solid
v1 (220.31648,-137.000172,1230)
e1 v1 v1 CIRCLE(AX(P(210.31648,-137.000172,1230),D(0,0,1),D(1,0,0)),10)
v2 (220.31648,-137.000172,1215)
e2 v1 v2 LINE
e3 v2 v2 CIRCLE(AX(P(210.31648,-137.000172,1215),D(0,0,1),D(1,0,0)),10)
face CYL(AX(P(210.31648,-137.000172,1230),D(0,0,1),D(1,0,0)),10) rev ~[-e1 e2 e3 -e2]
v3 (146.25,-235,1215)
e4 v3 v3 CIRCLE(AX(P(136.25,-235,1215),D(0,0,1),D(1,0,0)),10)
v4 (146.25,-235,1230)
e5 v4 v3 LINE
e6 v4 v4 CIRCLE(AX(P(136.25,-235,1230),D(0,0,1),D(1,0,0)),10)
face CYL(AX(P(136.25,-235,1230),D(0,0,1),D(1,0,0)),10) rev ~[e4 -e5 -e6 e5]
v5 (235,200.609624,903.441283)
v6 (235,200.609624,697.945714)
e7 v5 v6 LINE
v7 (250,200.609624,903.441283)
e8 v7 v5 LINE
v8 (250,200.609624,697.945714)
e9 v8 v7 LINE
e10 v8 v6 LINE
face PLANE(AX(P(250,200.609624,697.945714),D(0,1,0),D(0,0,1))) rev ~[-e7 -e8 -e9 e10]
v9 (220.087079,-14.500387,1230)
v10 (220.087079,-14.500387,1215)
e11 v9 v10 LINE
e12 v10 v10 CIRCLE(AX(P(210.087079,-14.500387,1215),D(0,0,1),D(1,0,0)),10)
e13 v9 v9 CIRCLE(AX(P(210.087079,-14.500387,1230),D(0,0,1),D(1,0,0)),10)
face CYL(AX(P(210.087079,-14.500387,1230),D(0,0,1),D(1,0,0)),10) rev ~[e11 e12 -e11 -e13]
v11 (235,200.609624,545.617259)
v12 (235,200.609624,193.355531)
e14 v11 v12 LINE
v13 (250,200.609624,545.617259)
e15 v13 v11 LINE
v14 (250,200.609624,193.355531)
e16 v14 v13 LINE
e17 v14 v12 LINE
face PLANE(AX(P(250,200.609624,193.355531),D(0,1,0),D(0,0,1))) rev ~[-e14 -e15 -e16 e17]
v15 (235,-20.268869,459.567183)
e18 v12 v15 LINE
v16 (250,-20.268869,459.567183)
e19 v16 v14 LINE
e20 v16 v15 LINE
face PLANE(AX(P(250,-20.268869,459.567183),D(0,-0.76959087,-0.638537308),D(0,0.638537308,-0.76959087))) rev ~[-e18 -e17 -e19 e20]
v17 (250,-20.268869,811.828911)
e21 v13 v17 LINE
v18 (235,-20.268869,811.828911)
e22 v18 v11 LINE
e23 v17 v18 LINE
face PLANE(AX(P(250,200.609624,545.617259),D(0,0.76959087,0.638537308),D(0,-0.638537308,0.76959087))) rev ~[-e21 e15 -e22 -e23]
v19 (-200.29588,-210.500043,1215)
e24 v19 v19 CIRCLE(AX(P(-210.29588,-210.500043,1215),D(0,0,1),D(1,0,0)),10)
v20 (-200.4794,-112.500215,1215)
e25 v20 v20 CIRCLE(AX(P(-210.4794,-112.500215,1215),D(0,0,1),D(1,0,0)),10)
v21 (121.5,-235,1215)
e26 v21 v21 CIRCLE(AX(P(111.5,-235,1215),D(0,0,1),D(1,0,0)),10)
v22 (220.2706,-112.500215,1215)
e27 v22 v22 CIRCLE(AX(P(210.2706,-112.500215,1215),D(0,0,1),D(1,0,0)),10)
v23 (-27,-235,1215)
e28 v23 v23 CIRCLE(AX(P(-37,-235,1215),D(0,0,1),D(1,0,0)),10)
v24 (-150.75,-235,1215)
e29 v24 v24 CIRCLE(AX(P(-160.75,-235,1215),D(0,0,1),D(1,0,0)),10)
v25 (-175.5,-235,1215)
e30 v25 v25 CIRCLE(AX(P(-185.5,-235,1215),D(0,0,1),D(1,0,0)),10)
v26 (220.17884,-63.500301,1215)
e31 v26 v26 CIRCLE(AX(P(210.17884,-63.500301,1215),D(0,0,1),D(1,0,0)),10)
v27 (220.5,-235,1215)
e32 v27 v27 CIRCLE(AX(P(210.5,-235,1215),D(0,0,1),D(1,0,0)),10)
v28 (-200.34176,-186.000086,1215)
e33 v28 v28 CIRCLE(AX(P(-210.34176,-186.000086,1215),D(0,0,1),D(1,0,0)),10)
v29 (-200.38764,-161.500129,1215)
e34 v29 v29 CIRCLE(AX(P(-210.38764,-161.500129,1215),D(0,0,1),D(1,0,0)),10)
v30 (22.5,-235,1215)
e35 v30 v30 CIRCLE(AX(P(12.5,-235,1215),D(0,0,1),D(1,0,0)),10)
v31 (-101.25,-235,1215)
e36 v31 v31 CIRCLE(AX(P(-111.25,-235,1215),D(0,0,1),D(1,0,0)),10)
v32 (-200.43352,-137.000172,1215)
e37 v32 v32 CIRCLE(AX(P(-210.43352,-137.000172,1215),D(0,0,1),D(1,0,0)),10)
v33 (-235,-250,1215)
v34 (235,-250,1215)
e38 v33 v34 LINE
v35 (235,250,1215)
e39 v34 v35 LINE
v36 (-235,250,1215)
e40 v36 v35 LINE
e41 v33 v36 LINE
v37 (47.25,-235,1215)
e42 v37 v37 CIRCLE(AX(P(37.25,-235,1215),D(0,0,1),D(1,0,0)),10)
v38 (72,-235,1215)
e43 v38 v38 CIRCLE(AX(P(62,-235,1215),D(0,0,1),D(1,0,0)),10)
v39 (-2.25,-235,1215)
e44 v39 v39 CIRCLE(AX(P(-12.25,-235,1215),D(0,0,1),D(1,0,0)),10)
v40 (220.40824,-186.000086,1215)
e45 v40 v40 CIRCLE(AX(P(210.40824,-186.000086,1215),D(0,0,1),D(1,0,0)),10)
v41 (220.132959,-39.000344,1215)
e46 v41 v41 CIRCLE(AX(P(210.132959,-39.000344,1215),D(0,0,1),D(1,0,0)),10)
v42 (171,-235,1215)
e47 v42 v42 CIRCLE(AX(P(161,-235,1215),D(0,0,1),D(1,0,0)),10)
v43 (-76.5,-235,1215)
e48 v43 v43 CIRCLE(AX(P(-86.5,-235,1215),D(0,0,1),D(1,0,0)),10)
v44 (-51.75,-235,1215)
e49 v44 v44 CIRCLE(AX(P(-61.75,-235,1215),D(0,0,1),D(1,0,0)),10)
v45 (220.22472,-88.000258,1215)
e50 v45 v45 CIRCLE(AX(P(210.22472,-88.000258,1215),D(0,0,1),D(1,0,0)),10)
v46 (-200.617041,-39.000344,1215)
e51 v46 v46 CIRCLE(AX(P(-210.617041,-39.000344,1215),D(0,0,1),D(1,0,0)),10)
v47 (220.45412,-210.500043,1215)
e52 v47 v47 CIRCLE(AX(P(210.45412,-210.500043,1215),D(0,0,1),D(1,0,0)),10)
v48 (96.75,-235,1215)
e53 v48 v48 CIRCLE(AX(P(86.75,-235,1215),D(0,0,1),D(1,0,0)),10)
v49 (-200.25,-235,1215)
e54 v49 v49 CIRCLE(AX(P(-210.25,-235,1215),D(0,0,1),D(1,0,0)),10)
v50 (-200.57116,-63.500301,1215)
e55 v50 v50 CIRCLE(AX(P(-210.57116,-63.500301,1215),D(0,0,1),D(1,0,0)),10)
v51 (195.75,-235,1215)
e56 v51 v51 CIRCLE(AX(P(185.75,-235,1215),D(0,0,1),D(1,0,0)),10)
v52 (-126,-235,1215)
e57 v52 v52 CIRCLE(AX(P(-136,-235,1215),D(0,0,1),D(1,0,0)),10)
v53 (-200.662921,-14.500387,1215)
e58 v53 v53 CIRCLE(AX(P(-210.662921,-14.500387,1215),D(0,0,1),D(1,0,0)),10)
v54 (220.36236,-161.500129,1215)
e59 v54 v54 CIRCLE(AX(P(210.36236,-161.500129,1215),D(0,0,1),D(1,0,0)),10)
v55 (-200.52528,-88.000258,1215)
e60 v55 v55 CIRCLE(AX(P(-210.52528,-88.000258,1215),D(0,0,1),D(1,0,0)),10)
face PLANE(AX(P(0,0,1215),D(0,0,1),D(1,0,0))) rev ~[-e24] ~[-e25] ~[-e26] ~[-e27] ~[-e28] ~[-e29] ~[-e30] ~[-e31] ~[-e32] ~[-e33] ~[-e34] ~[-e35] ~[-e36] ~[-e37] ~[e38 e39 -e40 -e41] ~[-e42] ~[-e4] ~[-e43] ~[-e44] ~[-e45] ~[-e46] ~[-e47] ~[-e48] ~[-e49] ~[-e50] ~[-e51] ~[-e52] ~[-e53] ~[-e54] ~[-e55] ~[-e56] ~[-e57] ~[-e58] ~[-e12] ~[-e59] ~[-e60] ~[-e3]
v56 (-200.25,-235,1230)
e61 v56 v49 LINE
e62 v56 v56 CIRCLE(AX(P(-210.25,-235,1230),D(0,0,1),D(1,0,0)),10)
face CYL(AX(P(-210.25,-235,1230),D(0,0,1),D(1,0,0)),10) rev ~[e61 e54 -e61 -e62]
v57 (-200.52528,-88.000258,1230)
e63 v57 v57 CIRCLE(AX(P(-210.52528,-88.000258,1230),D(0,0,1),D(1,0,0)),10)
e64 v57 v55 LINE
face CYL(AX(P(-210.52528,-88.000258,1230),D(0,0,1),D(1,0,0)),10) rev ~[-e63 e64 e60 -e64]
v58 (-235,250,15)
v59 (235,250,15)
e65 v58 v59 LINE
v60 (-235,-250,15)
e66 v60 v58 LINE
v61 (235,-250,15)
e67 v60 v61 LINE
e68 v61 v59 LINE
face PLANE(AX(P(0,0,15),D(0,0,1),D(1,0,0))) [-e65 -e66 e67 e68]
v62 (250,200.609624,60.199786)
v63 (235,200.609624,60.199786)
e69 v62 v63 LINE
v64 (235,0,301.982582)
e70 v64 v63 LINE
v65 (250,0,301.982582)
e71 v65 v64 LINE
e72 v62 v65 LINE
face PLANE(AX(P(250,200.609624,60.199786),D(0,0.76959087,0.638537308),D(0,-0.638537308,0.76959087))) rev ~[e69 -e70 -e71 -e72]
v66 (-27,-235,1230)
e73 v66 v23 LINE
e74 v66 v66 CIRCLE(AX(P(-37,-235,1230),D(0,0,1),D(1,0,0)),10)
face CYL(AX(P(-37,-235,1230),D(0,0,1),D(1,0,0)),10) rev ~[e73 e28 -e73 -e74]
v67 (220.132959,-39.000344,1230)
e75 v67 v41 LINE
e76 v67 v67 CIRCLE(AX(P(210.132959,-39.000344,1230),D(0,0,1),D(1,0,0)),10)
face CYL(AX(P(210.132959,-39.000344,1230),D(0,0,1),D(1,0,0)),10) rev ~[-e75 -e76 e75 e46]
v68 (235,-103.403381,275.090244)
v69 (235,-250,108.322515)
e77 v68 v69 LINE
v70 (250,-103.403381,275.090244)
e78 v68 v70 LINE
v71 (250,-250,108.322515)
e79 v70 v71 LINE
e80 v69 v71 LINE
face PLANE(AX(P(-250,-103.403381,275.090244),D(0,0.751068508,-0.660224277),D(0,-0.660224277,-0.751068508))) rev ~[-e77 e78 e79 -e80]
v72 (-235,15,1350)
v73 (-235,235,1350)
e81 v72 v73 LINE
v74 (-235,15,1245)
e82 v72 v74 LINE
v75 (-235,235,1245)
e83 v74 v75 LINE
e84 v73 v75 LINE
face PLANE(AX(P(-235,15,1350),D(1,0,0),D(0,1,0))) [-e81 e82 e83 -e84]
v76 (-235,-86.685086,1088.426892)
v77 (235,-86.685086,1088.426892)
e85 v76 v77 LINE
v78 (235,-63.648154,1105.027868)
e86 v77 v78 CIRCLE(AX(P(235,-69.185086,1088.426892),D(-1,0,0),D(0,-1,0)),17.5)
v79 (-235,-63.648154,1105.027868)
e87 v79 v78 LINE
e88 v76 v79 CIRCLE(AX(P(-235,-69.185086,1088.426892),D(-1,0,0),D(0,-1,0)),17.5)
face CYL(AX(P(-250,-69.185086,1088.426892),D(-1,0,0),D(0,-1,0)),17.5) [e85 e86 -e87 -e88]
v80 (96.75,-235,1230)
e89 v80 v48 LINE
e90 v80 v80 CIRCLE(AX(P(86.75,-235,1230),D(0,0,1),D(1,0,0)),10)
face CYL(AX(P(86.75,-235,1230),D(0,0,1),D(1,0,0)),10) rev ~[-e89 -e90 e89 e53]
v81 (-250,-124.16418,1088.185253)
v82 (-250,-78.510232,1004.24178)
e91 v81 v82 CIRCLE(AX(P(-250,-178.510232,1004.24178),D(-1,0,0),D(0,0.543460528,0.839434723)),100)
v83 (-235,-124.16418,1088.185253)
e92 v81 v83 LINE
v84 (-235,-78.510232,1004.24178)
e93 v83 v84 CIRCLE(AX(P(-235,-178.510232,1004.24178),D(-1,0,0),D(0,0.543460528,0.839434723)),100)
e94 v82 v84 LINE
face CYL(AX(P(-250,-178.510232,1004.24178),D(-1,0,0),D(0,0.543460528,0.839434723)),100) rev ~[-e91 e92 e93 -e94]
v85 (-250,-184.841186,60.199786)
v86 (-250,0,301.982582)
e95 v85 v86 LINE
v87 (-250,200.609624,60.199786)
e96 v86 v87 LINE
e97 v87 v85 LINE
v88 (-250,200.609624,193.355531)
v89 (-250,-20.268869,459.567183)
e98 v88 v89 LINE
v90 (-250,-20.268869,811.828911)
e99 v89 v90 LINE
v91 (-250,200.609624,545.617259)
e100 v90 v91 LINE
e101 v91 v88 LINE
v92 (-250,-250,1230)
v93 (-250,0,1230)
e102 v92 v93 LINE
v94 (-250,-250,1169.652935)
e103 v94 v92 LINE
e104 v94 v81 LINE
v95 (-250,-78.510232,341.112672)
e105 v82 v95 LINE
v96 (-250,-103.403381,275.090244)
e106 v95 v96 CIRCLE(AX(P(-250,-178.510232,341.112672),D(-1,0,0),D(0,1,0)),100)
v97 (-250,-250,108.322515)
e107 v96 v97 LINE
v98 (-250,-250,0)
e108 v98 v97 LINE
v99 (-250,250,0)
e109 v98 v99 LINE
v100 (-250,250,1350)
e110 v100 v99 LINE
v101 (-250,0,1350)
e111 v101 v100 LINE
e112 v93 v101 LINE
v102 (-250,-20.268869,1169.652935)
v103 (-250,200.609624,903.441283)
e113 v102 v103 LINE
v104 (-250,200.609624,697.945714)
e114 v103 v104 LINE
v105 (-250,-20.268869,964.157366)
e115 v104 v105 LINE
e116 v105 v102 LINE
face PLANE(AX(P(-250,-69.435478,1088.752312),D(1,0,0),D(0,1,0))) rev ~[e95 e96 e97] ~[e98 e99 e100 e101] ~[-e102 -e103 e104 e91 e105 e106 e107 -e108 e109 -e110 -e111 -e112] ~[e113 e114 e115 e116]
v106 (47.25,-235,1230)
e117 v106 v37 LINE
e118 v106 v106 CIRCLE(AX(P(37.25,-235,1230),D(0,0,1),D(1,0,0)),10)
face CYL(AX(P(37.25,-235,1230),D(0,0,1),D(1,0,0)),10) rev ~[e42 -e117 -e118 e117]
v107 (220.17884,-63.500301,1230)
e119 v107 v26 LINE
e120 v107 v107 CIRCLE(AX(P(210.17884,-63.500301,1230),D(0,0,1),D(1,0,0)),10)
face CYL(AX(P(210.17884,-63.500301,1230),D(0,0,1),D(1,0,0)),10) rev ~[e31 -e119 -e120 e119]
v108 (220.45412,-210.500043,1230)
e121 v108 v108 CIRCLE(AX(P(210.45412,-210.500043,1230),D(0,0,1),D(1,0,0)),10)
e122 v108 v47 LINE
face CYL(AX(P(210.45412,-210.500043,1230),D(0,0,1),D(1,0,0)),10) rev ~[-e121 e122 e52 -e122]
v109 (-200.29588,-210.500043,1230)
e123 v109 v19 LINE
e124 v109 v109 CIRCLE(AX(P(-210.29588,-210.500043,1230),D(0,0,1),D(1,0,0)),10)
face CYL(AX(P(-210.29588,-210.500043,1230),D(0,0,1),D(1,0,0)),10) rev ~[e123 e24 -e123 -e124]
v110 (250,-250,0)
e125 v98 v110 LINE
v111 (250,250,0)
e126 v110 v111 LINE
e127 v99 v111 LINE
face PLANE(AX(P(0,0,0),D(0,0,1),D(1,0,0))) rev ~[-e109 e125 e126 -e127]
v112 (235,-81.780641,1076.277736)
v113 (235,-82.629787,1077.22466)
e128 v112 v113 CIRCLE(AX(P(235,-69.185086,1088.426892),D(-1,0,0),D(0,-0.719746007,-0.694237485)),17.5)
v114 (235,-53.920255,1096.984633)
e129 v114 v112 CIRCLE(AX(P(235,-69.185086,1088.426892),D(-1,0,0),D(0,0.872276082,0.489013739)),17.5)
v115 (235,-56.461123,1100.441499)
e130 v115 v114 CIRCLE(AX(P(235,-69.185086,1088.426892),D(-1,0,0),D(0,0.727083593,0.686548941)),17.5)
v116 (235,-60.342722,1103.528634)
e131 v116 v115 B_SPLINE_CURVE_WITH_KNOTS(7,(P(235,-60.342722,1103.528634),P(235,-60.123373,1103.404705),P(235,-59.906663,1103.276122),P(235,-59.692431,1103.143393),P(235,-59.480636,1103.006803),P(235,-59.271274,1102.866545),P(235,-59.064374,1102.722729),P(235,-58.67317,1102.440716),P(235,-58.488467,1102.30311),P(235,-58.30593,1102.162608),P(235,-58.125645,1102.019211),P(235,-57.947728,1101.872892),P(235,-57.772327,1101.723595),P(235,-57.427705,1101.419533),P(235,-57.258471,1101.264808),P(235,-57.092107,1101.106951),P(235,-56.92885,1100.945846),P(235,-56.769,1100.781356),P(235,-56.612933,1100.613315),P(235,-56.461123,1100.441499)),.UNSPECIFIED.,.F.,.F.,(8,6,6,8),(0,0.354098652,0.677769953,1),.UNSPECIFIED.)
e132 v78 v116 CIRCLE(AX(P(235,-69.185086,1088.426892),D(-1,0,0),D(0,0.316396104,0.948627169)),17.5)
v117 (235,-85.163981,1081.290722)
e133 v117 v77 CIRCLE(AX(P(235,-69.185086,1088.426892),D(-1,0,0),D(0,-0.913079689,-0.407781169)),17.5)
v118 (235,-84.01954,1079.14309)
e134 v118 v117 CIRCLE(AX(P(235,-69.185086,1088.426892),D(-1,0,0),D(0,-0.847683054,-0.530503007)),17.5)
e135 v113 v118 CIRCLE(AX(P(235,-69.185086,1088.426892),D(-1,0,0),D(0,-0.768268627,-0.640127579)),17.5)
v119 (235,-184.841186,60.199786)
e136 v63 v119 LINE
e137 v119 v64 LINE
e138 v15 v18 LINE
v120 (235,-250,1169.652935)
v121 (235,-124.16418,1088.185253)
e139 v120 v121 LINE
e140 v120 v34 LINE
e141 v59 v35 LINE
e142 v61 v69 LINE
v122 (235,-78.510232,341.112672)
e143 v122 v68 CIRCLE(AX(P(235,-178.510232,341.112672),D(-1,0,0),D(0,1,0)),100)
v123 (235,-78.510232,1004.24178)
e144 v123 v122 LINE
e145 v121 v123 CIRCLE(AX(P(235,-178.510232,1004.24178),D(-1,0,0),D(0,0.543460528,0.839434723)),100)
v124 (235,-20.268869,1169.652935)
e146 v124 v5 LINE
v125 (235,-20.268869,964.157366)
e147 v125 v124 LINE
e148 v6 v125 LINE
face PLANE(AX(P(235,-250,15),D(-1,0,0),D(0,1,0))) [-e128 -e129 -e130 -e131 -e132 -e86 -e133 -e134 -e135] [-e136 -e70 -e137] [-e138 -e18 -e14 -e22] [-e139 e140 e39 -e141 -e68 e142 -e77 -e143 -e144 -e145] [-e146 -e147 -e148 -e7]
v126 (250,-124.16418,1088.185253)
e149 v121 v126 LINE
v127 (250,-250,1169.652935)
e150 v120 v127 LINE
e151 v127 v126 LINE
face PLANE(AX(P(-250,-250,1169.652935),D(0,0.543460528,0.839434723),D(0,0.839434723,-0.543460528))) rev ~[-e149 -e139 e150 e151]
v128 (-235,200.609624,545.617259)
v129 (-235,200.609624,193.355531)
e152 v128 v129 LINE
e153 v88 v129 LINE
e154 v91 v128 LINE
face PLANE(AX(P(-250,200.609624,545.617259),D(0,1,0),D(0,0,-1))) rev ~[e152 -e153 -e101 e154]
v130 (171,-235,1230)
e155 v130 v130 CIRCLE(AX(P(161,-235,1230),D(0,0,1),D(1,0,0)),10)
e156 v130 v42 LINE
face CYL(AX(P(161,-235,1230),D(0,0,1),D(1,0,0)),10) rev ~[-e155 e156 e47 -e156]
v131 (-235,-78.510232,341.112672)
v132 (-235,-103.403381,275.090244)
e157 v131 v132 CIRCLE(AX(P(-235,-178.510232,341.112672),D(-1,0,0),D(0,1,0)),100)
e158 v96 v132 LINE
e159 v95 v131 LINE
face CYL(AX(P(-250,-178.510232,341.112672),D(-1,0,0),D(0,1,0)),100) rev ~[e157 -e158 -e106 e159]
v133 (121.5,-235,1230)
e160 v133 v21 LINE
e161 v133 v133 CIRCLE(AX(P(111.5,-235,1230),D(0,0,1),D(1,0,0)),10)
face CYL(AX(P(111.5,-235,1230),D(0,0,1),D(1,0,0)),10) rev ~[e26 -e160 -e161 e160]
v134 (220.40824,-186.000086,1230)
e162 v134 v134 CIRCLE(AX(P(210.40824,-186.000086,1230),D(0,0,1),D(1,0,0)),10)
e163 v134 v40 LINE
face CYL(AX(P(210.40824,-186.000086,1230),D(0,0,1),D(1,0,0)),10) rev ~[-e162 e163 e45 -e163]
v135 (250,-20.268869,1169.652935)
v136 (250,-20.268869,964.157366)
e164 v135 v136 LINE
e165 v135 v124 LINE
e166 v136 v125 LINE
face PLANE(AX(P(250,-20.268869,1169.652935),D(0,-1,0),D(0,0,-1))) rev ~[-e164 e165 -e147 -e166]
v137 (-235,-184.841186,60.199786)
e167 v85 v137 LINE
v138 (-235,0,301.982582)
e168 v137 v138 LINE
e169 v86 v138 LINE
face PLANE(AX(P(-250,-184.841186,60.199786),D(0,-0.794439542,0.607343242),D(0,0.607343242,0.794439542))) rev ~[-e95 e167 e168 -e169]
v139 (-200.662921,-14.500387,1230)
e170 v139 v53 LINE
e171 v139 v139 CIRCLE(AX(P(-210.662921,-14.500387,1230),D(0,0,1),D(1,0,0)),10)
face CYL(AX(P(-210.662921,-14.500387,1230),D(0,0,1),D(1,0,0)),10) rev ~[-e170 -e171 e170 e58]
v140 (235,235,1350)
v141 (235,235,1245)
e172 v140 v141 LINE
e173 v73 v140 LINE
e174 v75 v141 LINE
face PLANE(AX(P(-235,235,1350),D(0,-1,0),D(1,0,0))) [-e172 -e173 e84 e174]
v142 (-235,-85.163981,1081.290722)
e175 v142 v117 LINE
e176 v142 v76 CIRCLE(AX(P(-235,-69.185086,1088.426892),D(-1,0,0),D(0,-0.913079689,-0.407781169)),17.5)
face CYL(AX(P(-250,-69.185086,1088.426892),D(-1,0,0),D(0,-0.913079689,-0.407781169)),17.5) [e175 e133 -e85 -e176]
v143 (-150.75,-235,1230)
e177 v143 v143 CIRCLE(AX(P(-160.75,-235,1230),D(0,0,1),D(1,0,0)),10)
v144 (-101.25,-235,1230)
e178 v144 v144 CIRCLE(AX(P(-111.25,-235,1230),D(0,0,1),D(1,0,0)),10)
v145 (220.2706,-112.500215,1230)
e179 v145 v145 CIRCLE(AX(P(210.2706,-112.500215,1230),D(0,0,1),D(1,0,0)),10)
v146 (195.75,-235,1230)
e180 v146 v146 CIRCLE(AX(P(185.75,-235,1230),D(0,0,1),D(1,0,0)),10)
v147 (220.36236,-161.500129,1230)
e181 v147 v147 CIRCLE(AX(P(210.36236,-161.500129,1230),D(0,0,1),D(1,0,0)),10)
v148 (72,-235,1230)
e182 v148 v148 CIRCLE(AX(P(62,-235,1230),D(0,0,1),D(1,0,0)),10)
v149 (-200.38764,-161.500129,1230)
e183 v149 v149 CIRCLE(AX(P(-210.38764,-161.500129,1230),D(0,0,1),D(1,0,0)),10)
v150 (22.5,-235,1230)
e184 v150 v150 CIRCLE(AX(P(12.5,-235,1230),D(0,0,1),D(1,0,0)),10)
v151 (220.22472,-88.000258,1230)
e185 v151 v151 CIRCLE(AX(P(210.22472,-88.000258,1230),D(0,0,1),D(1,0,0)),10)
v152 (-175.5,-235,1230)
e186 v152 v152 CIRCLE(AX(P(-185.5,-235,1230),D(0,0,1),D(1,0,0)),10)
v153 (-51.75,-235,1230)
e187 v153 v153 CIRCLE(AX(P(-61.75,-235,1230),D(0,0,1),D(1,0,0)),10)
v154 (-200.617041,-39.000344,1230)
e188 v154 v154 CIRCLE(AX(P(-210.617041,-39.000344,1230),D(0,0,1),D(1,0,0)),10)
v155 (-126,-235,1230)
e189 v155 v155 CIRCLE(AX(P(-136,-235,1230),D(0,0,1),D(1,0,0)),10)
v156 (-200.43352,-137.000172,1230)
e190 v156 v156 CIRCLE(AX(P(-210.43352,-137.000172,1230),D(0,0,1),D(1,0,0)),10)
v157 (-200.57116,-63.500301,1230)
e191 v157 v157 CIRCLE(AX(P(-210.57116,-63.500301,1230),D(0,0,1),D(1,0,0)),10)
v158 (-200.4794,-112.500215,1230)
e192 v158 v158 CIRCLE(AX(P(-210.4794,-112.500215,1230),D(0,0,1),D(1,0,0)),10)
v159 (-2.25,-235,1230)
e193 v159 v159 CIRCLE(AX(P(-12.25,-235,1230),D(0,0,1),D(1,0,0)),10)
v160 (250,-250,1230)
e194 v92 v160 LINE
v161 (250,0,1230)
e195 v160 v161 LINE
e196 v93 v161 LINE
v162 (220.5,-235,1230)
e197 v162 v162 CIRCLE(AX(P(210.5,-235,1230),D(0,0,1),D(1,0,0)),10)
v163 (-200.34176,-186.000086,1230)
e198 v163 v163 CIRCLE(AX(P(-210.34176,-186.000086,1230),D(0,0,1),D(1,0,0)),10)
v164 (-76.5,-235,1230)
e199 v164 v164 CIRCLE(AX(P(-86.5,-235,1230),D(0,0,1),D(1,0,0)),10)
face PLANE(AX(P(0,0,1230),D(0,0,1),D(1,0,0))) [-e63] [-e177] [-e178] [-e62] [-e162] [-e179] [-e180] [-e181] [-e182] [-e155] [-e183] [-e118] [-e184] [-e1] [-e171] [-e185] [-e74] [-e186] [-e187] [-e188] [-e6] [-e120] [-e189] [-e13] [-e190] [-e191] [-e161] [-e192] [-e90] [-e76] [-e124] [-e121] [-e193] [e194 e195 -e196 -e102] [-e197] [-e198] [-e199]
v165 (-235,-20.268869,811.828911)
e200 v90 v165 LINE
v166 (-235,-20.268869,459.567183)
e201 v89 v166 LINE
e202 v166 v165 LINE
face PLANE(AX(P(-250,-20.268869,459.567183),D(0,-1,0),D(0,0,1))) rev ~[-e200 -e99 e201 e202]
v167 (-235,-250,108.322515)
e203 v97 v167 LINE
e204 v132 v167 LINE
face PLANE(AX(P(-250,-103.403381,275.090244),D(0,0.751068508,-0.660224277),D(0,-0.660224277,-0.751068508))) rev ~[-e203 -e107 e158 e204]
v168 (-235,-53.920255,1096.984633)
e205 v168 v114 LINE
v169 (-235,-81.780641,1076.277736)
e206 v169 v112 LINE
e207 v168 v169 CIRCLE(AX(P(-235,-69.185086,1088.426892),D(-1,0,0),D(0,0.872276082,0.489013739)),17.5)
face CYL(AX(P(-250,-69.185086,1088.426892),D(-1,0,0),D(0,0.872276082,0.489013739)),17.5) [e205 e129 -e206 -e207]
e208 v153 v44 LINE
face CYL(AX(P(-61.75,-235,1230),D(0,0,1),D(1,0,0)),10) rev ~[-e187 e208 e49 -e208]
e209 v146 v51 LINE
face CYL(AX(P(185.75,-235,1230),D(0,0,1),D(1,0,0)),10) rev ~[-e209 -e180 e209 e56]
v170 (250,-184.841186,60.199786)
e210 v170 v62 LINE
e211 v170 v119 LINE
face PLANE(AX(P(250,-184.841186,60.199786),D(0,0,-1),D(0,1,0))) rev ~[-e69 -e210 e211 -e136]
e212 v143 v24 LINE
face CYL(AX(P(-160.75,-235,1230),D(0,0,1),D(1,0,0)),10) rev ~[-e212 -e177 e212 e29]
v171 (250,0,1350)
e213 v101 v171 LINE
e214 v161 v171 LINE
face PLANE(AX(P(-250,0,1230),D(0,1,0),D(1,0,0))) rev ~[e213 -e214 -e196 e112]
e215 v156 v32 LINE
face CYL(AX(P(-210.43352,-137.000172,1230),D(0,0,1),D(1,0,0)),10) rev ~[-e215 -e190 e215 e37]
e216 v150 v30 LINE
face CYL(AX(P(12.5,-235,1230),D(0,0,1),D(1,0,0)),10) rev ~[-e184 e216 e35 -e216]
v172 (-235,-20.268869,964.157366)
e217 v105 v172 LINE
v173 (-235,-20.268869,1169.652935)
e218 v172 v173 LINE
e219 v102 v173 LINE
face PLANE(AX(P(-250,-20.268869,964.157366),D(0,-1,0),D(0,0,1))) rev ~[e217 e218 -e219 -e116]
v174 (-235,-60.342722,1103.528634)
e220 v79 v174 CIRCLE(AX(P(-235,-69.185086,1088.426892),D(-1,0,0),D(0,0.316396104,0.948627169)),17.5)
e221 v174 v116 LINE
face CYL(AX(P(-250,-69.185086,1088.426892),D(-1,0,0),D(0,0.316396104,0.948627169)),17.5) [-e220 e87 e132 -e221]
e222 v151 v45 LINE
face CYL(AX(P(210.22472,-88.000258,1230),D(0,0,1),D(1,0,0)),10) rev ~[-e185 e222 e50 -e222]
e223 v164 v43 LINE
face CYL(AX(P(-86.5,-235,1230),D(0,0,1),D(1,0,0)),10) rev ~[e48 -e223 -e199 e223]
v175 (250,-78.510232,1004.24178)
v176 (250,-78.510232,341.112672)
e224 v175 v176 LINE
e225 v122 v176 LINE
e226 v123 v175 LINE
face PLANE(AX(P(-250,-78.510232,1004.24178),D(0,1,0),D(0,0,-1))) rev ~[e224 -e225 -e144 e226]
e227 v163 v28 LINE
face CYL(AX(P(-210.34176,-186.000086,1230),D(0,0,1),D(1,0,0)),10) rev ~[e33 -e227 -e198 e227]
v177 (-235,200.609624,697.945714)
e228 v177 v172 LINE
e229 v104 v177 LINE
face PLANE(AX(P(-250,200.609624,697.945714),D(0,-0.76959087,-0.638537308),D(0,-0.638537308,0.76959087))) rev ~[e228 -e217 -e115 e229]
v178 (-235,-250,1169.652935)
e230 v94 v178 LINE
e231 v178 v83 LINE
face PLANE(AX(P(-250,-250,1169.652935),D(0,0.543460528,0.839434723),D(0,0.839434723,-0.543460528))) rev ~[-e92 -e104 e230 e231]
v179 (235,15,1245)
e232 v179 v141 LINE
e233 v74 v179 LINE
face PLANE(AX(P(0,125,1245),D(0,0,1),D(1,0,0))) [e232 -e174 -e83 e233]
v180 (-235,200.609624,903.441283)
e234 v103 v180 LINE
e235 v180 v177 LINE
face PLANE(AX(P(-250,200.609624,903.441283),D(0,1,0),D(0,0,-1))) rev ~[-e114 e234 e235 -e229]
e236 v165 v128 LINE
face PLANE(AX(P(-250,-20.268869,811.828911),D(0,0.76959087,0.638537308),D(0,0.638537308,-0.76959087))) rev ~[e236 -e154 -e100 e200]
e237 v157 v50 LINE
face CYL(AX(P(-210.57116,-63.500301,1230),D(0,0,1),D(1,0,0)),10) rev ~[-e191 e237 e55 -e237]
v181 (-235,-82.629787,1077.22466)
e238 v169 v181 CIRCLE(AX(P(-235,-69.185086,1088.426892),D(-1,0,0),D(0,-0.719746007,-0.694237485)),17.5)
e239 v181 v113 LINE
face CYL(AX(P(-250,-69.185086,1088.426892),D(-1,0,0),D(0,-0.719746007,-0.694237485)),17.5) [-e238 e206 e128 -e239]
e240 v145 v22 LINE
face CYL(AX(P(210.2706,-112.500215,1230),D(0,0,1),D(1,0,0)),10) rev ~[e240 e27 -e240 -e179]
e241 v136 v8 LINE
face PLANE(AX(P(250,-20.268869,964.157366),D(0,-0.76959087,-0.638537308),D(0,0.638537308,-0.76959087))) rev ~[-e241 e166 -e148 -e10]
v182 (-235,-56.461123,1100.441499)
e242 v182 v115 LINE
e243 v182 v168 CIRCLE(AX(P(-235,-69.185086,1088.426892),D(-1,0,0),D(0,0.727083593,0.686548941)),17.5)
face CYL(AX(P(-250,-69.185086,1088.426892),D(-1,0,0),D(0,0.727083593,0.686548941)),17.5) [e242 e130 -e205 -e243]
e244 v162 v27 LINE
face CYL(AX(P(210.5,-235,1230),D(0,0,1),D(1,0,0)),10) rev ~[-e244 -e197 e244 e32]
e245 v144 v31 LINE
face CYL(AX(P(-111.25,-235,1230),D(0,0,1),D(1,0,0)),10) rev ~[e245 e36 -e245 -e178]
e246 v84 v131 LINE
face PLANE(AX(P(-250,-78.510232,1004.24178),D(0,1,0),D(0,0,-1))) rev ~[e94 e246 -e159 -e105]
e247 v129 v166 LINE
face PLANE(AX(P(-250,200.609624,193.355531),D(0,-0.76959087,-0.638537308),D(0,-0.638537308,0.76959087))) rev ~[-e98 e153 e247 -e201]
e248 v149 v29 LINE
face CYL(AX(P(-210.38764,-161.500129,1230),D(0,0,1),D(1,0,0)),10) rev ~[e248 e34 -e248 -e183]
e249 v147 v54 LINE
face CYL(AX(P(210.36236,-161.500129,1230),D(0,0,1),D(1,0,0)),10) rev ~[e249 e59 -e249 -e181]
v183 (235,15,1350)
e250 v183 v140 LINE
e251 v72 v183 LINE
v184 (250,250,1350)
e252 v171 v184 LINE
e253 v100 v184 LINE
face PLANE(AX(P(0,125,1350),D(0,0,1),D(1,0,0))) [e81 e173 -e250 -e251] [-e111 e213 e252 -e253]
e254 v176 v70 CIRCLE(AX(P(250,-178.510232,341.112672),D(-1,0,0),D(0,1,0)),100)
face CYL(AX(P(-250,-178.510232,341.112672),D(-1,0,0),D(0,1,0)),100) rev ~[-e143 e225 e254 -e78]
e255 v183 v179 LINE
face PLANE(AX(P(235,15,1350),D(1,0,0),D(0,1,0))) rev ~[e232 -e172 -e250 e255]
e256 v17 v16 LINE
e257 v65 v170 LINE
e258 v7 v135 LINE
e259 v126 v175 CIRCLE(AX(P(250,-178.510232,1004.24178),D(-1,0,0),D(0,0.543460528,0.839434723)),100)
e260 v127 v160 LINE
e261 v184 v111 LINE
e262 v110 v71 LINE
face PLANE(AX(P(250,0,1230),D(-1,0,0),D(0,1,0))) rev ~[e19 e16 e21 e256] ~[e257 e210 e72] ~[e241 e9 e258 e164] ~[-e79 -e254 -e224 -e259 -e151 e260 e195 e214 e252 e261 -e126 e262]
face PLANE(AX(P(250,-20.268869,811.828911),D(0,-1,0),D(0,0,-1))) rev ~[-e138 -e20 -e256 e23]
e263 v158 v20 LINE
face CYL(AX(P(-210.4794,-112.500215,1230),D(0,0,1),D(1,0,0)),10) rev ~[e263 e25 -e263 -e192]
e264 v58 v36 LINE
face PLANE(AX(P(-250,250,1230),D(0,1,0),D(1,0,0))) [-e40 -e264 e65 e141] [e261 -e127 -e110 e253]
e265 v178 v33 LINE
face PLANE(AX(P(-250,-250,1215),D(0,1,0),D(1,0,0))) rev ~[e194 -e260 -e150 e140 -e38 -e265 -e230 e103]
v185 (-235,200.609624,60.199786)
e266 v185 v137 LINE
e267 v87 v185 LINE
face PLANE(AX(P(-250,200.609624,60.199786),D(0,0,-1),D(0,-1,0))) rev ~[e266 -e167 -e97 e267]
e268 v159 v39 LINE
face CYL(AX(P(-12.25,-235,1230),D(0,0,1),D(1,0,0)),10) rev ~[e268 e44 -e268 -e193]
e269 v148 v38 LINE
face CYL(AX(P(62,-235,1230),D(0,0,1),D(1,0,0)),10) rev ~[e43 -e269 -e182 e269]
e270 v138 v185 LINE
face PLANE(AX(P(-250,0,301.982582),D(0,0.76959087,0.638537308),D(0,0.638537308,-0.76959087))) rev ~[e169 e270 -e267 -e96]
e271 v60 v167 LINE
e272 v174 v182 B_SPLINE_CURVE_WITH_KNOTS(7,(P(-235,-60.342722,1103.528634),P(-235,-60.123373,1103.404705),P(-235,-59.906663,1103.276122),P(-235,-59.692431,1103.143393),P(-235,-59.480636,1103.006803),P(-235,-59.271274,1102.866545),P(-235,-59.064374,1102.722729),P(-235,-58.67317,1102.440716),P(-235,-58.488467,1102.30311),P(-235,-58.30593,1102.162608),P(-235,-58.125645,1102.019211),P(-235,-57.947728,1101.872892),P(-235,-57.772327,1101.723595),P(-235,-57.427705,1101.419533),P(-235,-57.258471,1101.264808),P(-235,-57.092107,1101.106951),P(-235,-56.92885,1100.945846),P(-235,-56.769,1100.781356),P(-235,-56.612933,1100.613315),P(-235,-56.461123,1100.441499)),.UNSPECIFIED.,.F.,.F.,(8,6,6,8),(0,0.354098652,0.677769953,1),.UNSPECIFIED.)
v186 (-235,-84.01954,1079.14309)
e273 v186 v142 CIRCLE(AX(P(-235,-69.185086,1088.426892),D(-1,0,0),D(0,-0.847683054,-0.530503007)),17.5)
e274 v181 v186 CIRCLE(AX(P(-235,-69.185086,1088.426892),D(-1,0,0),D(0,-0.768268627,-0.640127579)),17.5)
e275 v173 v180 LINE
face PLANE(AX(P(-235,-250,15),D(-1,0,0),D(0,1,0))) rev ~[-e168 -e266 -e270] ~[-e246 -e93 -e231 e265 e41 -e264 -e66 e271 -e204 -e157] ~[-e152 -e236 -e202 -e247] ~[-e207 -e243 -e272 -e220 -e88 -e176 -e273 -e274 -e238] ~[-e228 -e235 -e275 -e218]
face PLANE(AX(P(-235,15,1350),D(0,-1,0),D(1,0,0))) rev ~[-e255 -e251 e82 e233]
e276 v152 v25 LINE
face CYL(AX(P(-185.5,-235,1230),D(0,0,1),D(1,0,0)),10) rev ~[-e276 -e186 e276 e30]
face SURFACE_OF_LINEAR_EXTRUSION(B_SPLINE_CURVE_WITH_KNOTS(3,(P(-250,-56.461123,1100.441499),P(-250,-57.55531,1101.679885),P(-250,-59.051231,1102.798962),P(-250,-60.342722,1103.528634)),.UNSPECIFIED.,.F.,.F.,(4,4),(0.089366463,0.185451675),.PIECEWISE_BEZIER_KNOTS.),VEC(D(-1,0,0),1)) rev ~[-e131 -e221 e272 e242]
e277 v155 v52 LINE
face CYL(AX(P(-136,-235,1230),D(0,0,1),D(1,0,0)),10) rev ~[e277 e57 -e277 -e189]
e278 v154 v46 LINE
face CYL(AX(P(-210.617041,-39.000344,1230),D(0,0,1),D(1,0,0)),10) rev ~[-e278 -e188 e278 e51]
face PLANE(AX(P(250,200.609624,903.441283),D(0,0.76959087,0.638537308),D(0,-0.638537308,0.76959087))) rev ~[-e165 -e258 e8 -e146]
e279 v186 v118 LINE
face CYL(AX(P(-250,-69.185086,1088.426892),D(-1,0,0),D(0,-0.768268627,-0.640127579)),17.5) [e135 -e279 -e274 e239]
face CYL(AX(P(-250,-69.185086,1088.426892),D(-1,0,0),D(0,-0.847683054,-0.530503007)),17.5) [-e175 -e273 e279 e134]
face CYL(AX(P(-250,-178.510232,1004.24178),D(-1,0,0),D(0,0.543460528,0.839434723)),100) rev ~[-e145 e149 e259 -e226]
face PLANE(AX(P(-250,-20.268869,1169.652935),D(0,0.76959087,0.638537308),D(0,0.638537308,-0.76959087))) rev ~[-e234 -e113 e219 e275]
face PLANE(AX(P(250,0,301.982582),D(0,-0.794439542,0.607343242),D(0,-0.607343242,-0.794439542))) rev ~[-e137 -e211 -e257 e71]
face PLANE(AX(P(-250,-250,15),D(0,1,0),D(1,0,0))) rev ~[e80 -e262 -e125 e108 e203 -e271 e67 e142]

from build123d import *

# Parameters (mm, degrees)
F0_W      = 500
F0_H      = 500
F1_DEPTH  = 15
F2_W      = 15
F2_H      = 500
F3_DEPTH  = 1200
F5_DEPTH  = 500
F6_W      = 500
F6_H      = 500
F7_DEPTH  = 15
F8_W      = 500
F8_H      = 250
F9_DEPTH  = 120
F10_W     = 470
F10_H     = 220
F11_DEPTH = 105
F12_R     = 10
F13_DEPTH = 25
F15_DEPTH = 25
F17_DEPTH = 25
F19_DEPTH = 500


with BuildPart() as f1:
    # F0 (on Top) → F1 (new body)
    with BuildSketch(Plane.XY):
        Rectangle(F0_W, F0_H)
    extrude(amount=F1_DEPTH)

    # F2 (on face) → F3 (join)
    with BuildSketch(Plane.XY.offset(15)):
        with Locations((-242.5, 0)):
            Rectangle(F2_W, F2_H)
        with Locations((242.5, 0)):
            Rectangle(F2_W, F2_H)
    extrude(amount=F3_DEPTH)

    # F4 (on face) → F5 (cut)
    with BuildSketch(Plane(origin=(-250, 0, 0), x_dir=(0, -1, 0), z_dir=(-1, 0, 0))):
        with BuildLine():
            Line((250, 108.3225146088), (250, 1169.652935098))
            Line((250, 1169.652935098), (124.1641795165, 1088.1852527777))
            ThreePointArc((124.1641795165, 1088.1852527777), (90.6620527914, 1052.0193626432), (78.5102322698, 1004.241780428))
            Line((78.5102322698, 1004.241780428), (78.5102322698, 341.1126717917))
            ThreePointArc((78.5102322698, 341.1126717917), (84.9402448732, 305.8329685815), (103.4033814418, 275.090244097))
            Line((103.4033814418, 275.090244097), (250, 108.3225146088))
        make_face()
    extrude(amount=-F5_DEPTH, mode=Mode.SUBTRACT)

    # F6 (on face) → F7 (join)
    with BuildSketch(Plane.XY.offset(1215)):
        Rectangle(F6_W, F6_H)
    extrude(amount=F7_DEPTH)

    # F8 (on face) → F9 (join)
    with BuildSketch(Plane.XY.offset(1230)):
        with Locations((0, 125)):
            Rectangle(F8_W, F8_H)
    extrude(amount=F9_DEPTH)

    # F10 (on face) → F11 (cut)
    with BuildSketch(Plane.XY.offset(1350)):
        with Locations((0, 125)):
            Rectangle(F10_W, F10_H)
    extrude(amount=-F11_DEPTH, mode=Mode.SUBTRACT)

    # F12 (on face) → F13 (cut)
    with BuildSketch(Plane.XY.offset(1230)):
        with Locations((-210.25, -235)):
            Circle(F12_R)
        with Locations((-185.5, -235)):
            Circle(F12_R)
        with Locations((-160.75, -235)):
            Circle(F12_R)
        with Locations((-136, -235)):
            Circle(F12_R)
        with Locations((-111.25, -235)):
            Circle(F12_R)
        with Locations((-86.5, -235)):
            Circle(F12_R)
        with Locations((-61.75, -235)):
            Circle(F12_R)
        with Locations((-37, -235)):
            Circle(F12_R)
        with Locations((-12.25, -235)):
            Circle(F12_R)
        with Locations((12.5, -235)):
            Circle(F12_R)
        with Locations((37.25, -235)):
            Circle(F12_R)
        with Locations((62, -235)):
            Circle(F12_R)
        with Locations((86.75, -235)):
            Circle(F12_R)
        with Locations((111.5, -235)):
            Circle(F12_R)
        with Locations((136.25, -235)):
            Circle(F12_R)
        with Locations((161, -235)):
            Circle(F12_R)
        with Locations((185.75, -235)):
            Circle(F12_R)
        with Locations((210.5, -235)):
            Circle(F12_R)
        with Locations((-210.2958800694, -210.5000429588)):
            Circle(F12_R)
        with Locations((-210.3417601387, -186.0000859177)):
            Circle(F12_R)
        with Locations((-210.3876402081, -161.5001288765)):
            Circle(F12_R)
        with Locations((-210.4335202775, -137.0001718353)):
            Circle(F12_R)
        with Locations((-210.4794003468, -112.5002147941)):
            Circle(F12_R)
        with Locations((-210.5252804162, -88.000257753)):
            Circle(F12_R)
        with Locations((-210.5711604856, -63.5003007118)):
            Circle(F12_R)
        with Locations((-210.6170405549, -39.0003436706)):
            Circle(F12_R)
        with Locations((-210.6629206243, -14.5003866295)):
            Circle(F12_R)
        with Locations((210.4541199306, -210.5000429588)):
            Circle(F12_R)
        with Locations((210.4082398613, -186.0000859177)):
            Circle(F12_R)
        with Locations((210.3623597919, -161.5001288765)):
            Circle(F12_R)
        with Locations((210.3164797225, -137.0001718353)):
            Circle(F12_R)
        with Locations((210.2705996532, -112.5002147941)):
            Circle(F12_R)
        with Locations((210.2247195838, -88.000257753)):
            Circle(F12_R)
        with Locations((210.1788395144, -63.5003007118)):
            Circle(F12_R)
        with Locations((210.1329594451, -39.0003436706)):
            Circle(F12_R)
        with Locations((210.0870793757, -14.5003866295)):
            Circle(F12_R)
    extrude(amount=-F13_DEPTH, mode=Mode.SUBTRACT)

    # F14 (on face) → F15 (cut)
    with BuildSketch(Plane(origin=(-250, 0, 0), x_dir=(0, -1, 0), z_dir=(-1, 0, 0))):
        Polygon((0, 301.9825816154), (-200.6096243858, 60.1997859776), (184.8411858082, 60.1997859776), align=None)
        Polygon((-200.6096243858, 545.617259301), (-200.6096243858, 193.3555305004), (20.2688685386, 459.5671825039), (20.2688685386, 811.8289113045), align=None)
        Polygon((-200.6096243858, 903.4412830945), (-200.6096243858, 697.9457139969), (20.2688685386, 964.1573660004), (20.2688685386, 1169.652935098), align=None)
    extrude(amount=-F15_DEPTH, mode=Mode.SUBTRACT)

    # F16 (on face) → F17 (cut)
    with BuildSketch(Plane.YZ.offset(250)):
        Polygon((200.6096243858, 903.4412830945), (-20.2688685386, 1169.652935098), (-20.2688685386, 964.1573660004), (200.6096243858, 697.9457139969), align=None)
        Polygon((200.6096243858, 545.617259301), (-20.2688685386, 811.8289113045), (-20.2688685386, 459.5671825039), (200.6096243858, 193.3555305004), align=None)
        Polygon((200.6096243858, 60.1997859776), (0, 301.9825816154), (-184.8411858082, 60.1997859776), align=None)
    extrude(amount=-F17_DEPTH, mode=Mode.SUBTRACT)

    # F18 (on face) → F19 (join)
    with BuildSketch(Plane(origin=(-250, 0, 0), x_dir=(0, -1, 0), z_dir=(-1, 0, 0))):
        with BuildLine():
            add(Edge.make_bspline(
                [(53.9202547284, 1096.9846327727), (54.7732887858, 1098.0347093312), (55.4434477794, 1099.2897070818), (56.4611232834, 1100.4414988147)],
                knots=[0, 0, 0, 0, 0.0893664626, 0.0893664626, 0.0893664626, 0.0893664626], degree=3))
            ThreePointArc((53.9202547284, 1096.9846327727), (58.7459698854, 1074.3814357408), (81.7806412913, 1076.2777363651))
            add(Edge.make_bspline(
                [(81.7806412913, 1076.2777363651), (82.0130700174, 1076.5925295791), (82.3047431486, 1076.8573193246), (82.629787133, 1077.224659717)],
                knots=[0, 0, 0, 0, 0.0708567707, 0.0708567707, 0.0708567707, 0.0708567707], degree=3))
            ThreePointArc((82.629787133, 1077.224659717), (83.3571621202, 1078.1603319134), (84.0195396019, 1079.1430897184))
            add(Edge.make_bspline(
                [(84.0195396019, 1079.1430897183), (84.4659025247, 1079.8776865412), (84.8451263222, 1080.6456217553), (85.1639807224, 1081.2907218933)],
                knots=[0.1675578427, 0.1675578427, 0.1675578427, 0.1675578427, 0.2655687466, 0.2655687466, 0.2655687466, 0.2655687466], degree=3))
            ThreePointArc((85.1639807224, 1081.2907218933), (86.3005857895, 1084.7786499445), (86.6850861658, 1088.4268923473))
            ThreePointArc((86.6850861658, 1088.4268923473), (79.4162565109, 1102.6245383975), (63.6481543522, 1105.0278678033))
            add(Edge.make_bspline(
                [(60.3427219255, 1103.5286337913), (61.44755319, 1104.15284537), (62.4027767886, 1104.4920782739), (63.6481543522, 1105.0278678033)],
                knots=[0.1854516751, 0.1854516751, 0.1854516751, 0.1854516751, 0.2676496457, 0.2676496457, 0.2676496457, 0.2676496457], degree=3))
            ThreePointArc((60.3427219255, 1103.5286337913), (58.2920050139, 1102.1232708109), (56.4611232834, 1100.4414988147))
        make_face()
        with BuildLine():
            ThreePointArc((56.4611232834, 1100.4414988147), (55.0843545331, 1098.7912238464), (53.9202547284, 1096.9846327727))
            add(Edge.make_bspline(
                [(53.9202547284, 1096.9846327727), (54.7732887858, 1098.0347093312), (55.4434477794, 1099.2897070818), (56.4611232834, 1100.4414988147)],
                knots=[0, 0, 0, 0, 0.0893664626, 0.0893664626, 0.0893664626, 0.0893664626], degree=3))
        make_face()
        with BuildLine():
            add(Edge.make_bspline(
                [(81.7806412913, 1076.2777363651), (82.0130700174, 1076.5925295791), (82.3047431486, 1076.8573193246), (82.629787133, 1077.224659717)],
                knots=[0, 0, 0, 0, 0.0708567707, 0.0708567707, 0.0708567707, 0.0708567707], degree=3))
            ThreePointArc((81.7806412913, 1076.2777363651), (82.2138198073, 1076.7434810433), (82.629787133, 1077.224659717))
        make_face()
        with BuildLine():
            add(Edge.make_bspline(
                [(56.4611232834, 1100.4414988147), (57.5553096742, 1101.6798845617), (59.0512308325, 1102.798962465), (60.3427219255, 1103.5286337913)],
                knots=[0.0893664626, 0.0893664626, 0.0893664626, 0.0893664626, 0.1854516751, 0.1854516751, 0.1854516751, 0.1854516751], degree=3))
            ThreePointArc((56.4611232834, 1100.4414988147), (58.2920050139, 1102.1232708109), (60.3427219255, 1103.5286337913))
        make_face()
        with BuildLine():
            ThreePointArc((63.6481543522, 1105.0278678033), (61.956464969, 1104.3641767958), (60.3427219255, 1103.5286337913))
            add(Edge.make_bspline(
                [(60.3427219255, 1103.5286337913), (61.44755319, 1104.15284537), (62.4027767886, 1104.4920782739), (63.6481543522, 1105.0278678033)],
                knots=[0.1854516751, 0.1854516751, 0.1854516751, 0.1854516751, 0.2676496457, 0.2676496457, 0.2676496457, 0.2676496457], degree=3))
        make_face()
        with BuildLine():
            add(Edge.make_bspline(
                [(84.0195396019, 1079.1430897183), (84.4659025247, 1079.8776865412), (84.8451263222, 1080.6456217553), (85.1639807224, 1081.2907218933)],
                knots=[0.1675578427, 0.1675578427, 0.1675578427, 0.1675578427, 0.2655687466, 0.2655687466, 0.2655687466, 0.2655687466], degree=3))
            ThreePointArc((84.0195396019, 1079.1430897184), (84.6291363023, 1080.1969886188), (85.1639807224, 1081.2907218933))
        make_face()
    extrude(amount=-F19_DEPTH)


solid = f1.part
